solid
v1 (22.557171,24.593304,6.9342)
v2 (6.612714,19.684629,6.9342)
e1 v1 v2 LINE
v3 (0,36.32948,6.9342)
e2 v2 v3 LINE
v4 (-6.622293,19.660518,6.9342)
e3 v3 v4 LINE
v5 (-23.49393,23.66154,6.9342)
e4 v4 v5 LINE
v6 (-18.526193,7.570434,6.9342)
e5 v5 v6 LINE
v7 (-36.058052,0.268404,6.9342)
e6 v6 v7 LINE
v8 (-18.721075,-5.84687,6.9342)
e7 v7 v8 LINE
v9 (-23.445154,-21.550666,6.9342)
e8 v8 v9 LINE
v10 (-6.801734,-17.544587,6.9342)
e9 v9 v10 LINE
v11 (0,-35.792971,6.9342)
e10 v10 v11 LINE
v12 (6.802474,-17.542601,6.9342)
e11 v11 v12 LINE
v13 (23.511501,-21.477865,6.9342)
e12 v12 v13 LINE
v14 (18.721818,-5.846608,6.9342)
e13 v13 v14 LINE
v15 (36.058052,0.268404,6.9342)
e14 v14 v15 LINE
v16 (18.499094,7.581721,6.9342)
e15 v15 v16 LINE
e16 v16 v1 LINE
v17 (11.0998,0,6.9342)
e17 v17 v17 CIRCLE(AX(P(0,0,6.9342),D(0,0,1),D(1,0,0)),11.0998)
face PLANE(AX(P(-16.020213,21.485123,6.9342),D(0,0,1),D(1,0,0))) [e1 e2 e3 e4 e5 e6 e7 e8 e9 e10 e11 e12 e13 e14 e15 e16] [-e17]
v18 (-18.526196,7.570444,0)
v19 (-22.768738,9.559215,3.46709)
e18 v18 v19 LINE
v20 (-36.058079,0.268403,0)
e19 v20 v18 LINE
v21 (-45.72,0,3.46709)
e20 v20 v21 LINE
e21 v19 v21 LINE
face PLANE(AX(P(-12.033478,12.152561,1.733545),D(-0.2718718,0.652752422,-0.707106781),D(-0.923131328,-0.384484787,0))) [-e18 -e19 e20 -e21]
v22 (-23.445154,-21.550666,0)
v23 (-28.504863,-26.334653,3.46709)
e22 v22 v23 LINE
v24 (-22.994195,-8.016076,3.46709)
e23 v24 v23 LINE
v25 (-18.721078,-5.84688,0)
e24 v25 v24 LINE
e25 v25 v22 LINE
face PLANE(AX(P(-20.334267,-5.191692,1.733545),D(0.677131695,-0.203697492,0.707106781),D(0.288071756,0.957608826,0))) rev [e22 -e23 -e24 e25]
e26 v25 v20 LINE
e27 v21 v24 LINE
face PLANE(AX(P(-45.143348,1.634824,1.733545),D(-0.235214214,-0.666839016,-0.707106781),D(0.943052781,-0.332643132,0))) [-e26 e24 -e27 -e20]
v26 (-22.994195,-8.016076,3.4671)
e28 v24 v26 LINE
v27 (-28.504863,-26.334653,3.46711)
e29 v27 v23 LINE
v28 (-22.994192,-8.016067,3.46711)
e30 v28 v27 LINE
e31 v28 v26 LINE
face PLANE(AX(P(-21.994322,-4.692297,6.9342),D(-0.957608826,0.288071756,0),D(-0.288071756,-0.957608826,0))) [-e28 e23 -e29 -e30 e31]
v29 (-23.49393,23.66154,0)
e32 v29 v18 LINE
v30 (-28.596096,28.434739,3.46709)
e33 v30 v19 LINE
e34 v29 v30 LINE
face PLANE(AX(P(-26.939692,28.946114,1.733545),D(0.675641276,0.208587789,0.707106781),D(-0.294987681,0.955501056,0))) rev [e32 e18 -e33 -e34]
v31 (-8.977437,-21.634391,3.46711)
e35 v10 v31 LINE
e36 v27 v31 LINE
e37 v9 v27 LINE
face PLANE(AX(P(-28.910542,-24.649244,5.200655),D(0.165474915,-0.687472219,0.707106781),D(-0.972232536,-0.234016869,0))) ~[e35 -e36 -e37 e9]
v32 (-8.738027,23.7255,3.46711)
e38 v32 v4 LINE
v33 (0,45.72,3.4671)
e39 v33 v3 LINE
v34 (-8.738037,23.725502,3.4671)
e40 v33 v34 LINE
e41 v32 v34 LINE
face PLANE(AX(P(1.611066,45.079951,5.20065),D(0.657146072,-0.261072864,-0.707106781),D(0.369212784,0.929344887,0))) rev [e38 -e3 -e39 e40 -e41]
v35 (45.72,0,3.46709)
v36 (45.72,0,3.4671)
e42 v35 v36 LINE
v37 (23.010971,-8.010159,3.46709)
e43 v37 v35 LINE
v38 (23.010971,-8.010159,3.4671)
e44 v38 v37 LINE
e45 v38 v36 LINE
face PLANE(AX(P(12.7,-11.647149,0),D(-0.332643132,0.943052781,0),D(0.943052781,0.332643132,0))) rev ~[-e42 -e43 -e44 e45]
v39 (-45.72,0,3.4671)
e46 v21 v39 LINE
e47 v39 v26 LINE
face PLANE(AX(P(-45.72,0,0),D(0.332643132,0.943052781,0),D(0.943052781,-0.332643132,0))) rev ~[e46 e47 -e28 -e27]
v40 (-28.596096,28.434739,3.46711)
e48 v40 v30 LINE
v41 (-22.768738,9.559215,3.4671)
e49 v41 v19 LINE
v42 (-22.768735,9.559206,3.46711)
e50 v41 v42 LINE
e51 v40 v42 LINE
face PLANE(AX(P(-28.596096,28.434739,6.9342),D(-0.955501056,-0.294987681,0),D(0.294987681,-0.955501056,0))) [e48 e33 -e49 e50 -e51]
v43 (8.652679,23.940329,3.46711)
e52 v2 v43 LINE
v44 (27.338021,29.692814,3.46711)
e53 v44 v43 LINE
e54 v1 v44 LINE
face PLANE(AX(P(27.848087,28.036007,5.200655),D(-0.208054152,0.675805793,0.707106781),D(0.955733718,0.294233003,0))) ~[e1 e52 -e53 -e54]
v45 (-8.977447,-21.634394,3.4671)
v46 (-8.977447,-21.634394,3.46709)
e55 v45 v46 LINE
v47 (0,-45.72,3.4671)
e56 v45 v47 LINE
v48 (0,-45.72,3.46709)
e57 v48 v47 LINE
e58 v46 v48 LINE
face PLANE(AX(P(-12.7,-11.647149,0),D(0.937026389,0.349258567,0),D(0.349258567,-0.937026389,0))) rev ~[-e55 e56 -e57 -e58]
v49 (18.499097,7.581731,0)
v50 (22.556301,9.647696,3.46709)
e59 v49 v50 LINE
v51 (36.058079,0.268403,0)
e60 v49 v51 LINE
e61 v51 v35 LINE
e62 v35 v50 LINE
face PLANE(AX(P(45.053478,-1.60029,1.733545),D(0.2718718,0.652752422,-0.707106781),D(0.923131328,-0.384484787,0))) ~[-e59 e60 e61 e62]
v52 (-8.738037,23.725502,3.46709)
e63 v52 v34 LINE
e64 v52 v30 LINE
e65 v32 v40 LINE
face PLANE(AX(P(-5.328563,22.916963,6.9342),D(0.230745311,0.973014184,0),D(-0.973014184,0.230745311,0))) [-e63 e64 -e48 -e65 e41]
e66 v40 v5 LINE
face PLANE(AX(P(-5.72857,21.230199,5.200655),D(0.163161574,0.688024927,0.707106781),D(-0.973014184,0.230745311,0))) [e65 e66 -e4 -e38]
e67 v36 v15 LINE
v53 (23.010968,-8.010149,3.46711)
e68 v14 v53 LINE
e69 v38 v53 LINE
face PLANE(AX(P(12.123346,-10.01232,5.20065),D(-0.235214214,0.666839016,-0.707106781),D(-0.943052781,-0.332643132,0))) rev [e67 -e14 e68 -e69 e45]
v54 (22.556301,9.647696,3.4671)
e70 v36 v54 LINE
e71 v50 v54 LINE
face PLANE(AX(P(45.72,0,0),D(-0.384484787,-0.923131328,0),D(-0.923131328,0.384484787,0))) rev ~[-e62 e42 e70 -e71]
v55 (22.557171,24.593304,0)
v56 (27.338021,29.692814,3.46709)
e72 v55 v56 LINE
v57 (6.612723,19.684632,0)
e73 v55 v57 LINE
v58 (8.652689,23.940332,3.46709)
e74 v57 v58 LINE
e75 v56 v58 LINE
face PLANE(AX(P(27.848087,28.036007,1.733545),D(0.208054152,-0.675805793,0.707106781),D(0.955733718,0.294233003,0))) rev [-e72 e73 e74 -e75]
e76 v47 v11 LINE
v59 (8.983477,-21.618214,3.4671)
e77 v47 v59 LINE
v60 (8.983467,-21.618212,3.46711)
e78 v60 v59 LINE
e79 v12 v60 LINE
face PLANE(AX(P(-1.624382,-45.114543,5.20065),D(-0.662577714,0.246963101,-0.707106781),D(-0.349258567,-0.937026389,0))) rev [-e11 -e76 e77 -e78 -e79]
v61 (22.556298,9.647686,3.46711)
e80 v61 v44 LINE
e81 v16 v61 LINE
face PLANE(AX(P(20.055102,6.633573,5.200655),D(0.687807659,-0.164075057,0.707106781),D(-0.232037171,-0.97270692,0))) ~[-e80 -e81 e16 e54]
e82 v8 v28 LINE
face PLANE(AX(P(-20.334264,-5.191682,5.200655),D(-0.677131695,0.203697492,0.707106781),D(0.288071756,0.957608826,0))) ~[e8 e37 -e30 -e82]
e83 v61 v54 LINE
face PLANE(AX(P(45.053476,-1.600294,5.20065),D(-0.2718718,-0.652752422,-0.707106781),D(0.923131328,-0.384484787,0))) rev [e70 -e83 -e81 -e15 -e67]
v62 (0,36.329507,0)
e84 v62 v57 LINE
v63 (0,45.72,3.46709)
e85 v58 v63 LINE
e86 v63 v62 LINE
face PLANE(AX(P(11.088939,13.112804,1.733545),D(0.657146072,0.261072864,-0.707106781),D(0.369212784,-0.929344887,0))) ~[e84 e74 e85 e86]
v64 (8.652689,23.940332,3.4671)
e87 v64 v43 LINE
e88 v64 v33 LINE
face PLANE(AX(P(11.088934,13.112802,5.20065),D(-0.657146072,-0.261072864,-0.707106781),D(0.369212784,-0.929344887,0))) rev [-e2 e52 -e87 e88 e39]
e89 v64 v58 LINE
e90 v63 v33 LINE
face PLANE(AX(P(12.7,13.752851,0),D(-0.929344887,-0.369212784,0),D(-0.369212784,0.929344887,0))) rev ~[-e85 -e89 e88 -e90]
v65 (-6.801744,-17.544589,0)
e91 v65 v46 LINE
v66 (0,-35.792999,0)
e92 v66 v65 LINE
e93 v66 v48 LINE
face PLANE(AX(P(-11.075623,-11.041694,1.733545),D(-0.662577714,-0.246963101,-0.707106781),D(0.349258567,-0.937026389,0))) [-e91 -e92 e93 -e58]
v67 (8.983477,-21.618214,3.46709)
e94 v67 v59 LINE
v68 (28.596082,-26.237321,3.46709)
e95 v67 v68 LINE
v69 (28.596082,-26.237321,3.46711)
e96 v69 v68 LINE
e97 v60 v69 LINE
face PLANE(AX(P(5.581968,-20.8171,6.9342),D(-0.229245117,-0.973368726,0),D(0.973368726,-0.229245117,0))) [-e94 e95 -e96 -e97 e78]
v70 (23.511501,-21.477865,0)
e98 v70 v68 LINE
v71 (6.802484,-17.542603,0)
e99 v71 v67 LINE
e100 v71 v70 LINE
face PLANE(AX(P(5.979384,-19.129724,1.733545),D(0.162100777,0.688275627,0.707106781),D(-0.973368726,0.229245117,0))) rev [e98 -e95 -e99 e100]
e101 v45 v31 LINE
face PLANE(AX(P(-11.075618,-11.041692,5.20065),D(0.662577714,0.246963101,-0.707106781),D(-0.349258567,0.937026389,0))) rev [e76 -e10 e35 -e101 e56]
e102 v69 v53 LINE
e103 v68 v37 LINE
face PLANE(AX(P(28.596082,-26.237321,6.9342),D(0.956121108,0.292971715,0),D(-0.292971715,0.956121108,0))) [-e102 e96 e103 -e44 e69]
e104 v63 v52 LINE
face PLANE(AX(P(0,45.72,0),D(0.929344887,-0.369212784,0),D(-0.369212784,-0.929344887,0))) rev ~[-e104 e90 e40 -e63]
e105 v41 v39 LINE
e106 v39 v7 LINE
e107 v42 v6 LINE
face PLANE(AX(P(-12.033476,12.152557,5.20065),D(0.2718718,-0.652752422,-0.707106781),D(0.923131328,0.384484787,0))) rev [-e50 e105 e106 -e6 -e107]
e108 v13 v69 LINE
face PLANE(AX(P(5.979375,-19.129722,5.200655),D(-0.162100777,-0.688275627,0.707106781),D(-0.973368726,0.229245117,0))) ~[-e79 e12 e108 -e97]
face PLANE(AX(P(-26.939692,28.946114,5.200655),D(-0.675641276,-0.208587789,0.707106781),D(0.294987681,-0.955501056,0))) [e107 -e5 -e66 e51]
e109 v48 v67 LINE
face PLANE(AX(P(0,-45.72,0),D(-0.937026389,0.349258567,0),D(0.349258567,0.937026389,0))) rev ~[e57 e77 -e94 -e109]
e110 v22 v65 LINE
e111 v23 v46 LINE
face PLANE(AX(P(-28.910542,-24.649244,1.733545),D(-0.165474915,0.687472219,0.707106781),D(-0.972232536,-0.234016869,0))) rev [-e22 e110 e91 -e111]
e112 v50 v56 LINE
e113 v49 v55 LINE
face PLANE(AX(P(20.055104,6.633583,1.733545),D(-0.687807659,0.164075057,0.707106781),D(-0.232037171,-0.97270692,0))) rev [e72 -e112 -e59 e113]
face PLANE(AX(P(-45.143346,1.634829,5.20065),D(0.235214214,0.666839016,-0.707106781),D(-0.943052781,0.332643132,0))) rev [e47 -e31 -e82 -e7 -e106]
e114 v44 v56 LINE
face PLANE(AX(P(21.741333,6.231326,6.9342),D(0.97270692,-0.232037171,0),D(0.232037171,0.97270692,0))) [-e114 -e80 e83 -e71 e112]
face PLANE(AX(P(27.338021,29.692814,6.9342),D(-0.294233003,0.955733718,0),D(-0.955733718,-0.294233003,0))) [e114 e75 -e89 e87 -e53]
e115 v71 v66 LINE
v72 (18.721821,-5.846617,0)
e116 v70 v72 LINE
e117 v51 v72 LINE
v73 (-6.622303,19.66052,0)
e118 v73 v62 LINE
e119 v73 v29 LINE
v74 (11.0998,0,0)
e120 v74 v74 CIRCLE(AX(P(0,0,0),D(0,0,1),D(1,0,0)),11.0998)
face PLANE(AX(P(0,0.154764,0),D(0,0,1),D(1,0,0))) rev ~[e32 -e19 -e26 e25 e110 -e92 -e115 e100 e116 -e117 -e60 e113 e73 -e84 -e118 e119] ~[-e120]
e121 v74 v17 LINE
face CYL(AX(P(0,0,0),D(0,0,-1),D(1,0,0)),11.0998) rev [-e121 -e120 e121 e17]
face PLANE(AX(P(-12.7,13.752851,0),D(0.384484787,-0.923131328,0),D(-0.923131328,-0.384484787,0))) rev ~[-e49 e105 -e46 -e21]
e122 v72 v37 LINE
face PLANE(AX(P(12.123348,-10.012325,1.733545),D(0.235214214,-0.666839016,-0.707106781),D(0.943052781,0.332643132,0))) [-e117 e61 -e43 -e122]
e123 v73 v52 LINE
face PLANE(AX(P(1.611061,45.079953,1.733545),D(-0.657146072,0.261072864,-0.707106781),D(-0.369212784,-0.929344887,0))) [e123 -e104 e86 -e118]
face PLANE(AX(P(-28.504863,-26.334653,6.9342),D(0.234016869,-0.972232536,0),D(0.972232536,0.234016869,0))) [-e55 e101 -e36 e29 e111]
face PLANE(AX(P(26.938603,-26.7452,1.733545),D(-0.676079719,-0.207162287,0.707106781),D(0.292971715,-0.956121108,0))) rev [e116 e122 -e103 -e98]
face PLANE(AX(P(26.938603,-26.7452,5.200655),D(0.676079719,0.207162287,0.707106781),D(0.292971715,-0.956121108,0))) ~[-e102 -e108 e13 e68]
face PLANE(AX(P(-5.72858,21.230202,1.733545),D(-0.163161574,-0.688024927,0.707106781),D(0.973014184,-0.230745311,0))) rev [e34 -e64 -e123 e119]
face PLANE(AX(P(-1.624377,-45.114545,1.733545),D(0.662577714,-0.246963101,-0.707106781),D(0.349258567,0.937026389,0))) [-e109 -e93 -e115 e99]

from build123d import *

# Parameters (mm, degrees)
F0_R     = 11.0998
F1_DEPTH = 6.9342
F2_SIZE  = 3.4671
F3_SIZE  = 3.46709
F5_DEPTH = 6.9342
F6_SIZE  = 3.46709


# Not quite as in the source:
# - a fillet or chamfer is up to 0.001 mm smaller than in the source, because OpenCascade refuses the exact size


with BuildPart() as f1:
    # F0 (on Top) → F1 (new body)
    with BuildSketch(Plane.XY):
        Polygon((12.7, 13.7528510513), (0, 45.72), (-12.7, 13.7528510513), (-45.72, 0), (-12.7, -11.6471489487), (0, -45.72), (12.7, -11.6471489487), (45.72, 0), align=None)
        Circle(F0_R, mode=Mode.SUBTRACT)
    extrude(amount=F1_DEPTH)

    # F2
    f2_edges = [f1.edges().sort_by_distance(p)[0] for p in [
        (6.35, -28.683574, 6.9342),
        (29.21, -5.823574, 6.9342),
        (-29.21, -5.823574, 6.9342),
        (-6.35, 29.736426, 6.9342),
        (-29.21, 6.876426, 6.9342),
        (6.35, 29.736426, 6.9342),
        (29.21, 6.876426, 6.9342),
        (-6.35, -28.683574, 6.9342),
    ]]
    chamfer(f2_edges, length=F2_SIZE)

    # F3 (size 3.4671 in the source; OpenCascade refuses exactly that, so slightly less here)
    f3_edges = [f1.edges().sort_by_distance(p)[0] for p in [
        (6.35, -28.683574, 0),
        (29.21, -5.823574, 0),
        (-29.21, -5.823574, 0),
        (-6.35, -28.683574, 0),
        (6.35, 29.736426, 0),
        (29.21, 6.876426, 0),
        (-29.21, 6.876426, 0),
        (-6.35, 29.736426, 0),
    ]]
    chamfer(f3_edges, length=F3_SIZE)

    # F4 (on face) → F5 (join)
    with BuildSketch(Plane.XY.offset(6.9342)):
        Polygon((-5.3285628953, 22.9169632653), (-28.5960960526, 28.4347391196), (-10.0175652565, 11.1142831944), align=None)
        Polygon((-28.5960960526, 28.4347391196), (-21.7413331227, 6.2313264038), (-10.0175652565, 11.1142831944), align=None)
        Polygon((27.3380211817, 29.6928139905), (5.3285628953, 22.9169632653), (10.0175652565, 11.1142831944), align=None)
        Polygon((27.3380211817, 29.6928139905), (10.0175652565, 11.1142831944), (21.7413331227, 6.2313264038), align=None)
        Polygon((10.0175516395, -8.916864886), (5.5819678365, -20.8171000234), (28.5960824356, -26.2373208112), align=None)
        Polygon((-5.5819678365, -20.8171000234), (-10.0175516395, -8.916864886), (-28.504862756, -26.3346525665), align=None)
        Polygon((-10.0175516395, -8.916864886), (-21.9943219535, -4.6922971158), (-28.504862756, -26.3346525665), align=None)
        Polygon((21.9943219535, -4.6922971158), (10.0175516395, -8.916864886), (28.5960824356, -26.2373208112), align=None)
    extrude(amount=-F5_DEPTH)

    # F6 (size 3.4671 in the source; OpenCascade refuses exactly that, so slightly less here)
    f6_edges = [f1.edges().sort_by_distance(p)[0] for p in [
        (17.089025, -23.52721, 6.9342),
        (25.295202, -15.464809, 6.9342),
        (24.539677, 17.96207, 6.9342),
        (-17.043415, -23.575876, 6.9342),
        (-25.249592, -15.513475, 6.9342),
        (-25.168715, 17.333033, 6.9342),
        (-16.962329, 25.675851, 6.9342),
        (16.333292, 26.304889, 6.9342),
        (24.539678, 17.962075, 0),
        (25.295204, -15.464814, 0),
        (17.08903, -23.527212, 0),
        (-17.04342, -23.575877, 0),
        (16.333297, 26.30489, 0),
        (-16.962334, 25.675852, 0),
        (-25.168716, 17.333038, 0),
        (-25.249594, -15.51348, 0),
    ]]
    chamfer(f6_edges, length=F6_SIZE)


solid = f1.part
